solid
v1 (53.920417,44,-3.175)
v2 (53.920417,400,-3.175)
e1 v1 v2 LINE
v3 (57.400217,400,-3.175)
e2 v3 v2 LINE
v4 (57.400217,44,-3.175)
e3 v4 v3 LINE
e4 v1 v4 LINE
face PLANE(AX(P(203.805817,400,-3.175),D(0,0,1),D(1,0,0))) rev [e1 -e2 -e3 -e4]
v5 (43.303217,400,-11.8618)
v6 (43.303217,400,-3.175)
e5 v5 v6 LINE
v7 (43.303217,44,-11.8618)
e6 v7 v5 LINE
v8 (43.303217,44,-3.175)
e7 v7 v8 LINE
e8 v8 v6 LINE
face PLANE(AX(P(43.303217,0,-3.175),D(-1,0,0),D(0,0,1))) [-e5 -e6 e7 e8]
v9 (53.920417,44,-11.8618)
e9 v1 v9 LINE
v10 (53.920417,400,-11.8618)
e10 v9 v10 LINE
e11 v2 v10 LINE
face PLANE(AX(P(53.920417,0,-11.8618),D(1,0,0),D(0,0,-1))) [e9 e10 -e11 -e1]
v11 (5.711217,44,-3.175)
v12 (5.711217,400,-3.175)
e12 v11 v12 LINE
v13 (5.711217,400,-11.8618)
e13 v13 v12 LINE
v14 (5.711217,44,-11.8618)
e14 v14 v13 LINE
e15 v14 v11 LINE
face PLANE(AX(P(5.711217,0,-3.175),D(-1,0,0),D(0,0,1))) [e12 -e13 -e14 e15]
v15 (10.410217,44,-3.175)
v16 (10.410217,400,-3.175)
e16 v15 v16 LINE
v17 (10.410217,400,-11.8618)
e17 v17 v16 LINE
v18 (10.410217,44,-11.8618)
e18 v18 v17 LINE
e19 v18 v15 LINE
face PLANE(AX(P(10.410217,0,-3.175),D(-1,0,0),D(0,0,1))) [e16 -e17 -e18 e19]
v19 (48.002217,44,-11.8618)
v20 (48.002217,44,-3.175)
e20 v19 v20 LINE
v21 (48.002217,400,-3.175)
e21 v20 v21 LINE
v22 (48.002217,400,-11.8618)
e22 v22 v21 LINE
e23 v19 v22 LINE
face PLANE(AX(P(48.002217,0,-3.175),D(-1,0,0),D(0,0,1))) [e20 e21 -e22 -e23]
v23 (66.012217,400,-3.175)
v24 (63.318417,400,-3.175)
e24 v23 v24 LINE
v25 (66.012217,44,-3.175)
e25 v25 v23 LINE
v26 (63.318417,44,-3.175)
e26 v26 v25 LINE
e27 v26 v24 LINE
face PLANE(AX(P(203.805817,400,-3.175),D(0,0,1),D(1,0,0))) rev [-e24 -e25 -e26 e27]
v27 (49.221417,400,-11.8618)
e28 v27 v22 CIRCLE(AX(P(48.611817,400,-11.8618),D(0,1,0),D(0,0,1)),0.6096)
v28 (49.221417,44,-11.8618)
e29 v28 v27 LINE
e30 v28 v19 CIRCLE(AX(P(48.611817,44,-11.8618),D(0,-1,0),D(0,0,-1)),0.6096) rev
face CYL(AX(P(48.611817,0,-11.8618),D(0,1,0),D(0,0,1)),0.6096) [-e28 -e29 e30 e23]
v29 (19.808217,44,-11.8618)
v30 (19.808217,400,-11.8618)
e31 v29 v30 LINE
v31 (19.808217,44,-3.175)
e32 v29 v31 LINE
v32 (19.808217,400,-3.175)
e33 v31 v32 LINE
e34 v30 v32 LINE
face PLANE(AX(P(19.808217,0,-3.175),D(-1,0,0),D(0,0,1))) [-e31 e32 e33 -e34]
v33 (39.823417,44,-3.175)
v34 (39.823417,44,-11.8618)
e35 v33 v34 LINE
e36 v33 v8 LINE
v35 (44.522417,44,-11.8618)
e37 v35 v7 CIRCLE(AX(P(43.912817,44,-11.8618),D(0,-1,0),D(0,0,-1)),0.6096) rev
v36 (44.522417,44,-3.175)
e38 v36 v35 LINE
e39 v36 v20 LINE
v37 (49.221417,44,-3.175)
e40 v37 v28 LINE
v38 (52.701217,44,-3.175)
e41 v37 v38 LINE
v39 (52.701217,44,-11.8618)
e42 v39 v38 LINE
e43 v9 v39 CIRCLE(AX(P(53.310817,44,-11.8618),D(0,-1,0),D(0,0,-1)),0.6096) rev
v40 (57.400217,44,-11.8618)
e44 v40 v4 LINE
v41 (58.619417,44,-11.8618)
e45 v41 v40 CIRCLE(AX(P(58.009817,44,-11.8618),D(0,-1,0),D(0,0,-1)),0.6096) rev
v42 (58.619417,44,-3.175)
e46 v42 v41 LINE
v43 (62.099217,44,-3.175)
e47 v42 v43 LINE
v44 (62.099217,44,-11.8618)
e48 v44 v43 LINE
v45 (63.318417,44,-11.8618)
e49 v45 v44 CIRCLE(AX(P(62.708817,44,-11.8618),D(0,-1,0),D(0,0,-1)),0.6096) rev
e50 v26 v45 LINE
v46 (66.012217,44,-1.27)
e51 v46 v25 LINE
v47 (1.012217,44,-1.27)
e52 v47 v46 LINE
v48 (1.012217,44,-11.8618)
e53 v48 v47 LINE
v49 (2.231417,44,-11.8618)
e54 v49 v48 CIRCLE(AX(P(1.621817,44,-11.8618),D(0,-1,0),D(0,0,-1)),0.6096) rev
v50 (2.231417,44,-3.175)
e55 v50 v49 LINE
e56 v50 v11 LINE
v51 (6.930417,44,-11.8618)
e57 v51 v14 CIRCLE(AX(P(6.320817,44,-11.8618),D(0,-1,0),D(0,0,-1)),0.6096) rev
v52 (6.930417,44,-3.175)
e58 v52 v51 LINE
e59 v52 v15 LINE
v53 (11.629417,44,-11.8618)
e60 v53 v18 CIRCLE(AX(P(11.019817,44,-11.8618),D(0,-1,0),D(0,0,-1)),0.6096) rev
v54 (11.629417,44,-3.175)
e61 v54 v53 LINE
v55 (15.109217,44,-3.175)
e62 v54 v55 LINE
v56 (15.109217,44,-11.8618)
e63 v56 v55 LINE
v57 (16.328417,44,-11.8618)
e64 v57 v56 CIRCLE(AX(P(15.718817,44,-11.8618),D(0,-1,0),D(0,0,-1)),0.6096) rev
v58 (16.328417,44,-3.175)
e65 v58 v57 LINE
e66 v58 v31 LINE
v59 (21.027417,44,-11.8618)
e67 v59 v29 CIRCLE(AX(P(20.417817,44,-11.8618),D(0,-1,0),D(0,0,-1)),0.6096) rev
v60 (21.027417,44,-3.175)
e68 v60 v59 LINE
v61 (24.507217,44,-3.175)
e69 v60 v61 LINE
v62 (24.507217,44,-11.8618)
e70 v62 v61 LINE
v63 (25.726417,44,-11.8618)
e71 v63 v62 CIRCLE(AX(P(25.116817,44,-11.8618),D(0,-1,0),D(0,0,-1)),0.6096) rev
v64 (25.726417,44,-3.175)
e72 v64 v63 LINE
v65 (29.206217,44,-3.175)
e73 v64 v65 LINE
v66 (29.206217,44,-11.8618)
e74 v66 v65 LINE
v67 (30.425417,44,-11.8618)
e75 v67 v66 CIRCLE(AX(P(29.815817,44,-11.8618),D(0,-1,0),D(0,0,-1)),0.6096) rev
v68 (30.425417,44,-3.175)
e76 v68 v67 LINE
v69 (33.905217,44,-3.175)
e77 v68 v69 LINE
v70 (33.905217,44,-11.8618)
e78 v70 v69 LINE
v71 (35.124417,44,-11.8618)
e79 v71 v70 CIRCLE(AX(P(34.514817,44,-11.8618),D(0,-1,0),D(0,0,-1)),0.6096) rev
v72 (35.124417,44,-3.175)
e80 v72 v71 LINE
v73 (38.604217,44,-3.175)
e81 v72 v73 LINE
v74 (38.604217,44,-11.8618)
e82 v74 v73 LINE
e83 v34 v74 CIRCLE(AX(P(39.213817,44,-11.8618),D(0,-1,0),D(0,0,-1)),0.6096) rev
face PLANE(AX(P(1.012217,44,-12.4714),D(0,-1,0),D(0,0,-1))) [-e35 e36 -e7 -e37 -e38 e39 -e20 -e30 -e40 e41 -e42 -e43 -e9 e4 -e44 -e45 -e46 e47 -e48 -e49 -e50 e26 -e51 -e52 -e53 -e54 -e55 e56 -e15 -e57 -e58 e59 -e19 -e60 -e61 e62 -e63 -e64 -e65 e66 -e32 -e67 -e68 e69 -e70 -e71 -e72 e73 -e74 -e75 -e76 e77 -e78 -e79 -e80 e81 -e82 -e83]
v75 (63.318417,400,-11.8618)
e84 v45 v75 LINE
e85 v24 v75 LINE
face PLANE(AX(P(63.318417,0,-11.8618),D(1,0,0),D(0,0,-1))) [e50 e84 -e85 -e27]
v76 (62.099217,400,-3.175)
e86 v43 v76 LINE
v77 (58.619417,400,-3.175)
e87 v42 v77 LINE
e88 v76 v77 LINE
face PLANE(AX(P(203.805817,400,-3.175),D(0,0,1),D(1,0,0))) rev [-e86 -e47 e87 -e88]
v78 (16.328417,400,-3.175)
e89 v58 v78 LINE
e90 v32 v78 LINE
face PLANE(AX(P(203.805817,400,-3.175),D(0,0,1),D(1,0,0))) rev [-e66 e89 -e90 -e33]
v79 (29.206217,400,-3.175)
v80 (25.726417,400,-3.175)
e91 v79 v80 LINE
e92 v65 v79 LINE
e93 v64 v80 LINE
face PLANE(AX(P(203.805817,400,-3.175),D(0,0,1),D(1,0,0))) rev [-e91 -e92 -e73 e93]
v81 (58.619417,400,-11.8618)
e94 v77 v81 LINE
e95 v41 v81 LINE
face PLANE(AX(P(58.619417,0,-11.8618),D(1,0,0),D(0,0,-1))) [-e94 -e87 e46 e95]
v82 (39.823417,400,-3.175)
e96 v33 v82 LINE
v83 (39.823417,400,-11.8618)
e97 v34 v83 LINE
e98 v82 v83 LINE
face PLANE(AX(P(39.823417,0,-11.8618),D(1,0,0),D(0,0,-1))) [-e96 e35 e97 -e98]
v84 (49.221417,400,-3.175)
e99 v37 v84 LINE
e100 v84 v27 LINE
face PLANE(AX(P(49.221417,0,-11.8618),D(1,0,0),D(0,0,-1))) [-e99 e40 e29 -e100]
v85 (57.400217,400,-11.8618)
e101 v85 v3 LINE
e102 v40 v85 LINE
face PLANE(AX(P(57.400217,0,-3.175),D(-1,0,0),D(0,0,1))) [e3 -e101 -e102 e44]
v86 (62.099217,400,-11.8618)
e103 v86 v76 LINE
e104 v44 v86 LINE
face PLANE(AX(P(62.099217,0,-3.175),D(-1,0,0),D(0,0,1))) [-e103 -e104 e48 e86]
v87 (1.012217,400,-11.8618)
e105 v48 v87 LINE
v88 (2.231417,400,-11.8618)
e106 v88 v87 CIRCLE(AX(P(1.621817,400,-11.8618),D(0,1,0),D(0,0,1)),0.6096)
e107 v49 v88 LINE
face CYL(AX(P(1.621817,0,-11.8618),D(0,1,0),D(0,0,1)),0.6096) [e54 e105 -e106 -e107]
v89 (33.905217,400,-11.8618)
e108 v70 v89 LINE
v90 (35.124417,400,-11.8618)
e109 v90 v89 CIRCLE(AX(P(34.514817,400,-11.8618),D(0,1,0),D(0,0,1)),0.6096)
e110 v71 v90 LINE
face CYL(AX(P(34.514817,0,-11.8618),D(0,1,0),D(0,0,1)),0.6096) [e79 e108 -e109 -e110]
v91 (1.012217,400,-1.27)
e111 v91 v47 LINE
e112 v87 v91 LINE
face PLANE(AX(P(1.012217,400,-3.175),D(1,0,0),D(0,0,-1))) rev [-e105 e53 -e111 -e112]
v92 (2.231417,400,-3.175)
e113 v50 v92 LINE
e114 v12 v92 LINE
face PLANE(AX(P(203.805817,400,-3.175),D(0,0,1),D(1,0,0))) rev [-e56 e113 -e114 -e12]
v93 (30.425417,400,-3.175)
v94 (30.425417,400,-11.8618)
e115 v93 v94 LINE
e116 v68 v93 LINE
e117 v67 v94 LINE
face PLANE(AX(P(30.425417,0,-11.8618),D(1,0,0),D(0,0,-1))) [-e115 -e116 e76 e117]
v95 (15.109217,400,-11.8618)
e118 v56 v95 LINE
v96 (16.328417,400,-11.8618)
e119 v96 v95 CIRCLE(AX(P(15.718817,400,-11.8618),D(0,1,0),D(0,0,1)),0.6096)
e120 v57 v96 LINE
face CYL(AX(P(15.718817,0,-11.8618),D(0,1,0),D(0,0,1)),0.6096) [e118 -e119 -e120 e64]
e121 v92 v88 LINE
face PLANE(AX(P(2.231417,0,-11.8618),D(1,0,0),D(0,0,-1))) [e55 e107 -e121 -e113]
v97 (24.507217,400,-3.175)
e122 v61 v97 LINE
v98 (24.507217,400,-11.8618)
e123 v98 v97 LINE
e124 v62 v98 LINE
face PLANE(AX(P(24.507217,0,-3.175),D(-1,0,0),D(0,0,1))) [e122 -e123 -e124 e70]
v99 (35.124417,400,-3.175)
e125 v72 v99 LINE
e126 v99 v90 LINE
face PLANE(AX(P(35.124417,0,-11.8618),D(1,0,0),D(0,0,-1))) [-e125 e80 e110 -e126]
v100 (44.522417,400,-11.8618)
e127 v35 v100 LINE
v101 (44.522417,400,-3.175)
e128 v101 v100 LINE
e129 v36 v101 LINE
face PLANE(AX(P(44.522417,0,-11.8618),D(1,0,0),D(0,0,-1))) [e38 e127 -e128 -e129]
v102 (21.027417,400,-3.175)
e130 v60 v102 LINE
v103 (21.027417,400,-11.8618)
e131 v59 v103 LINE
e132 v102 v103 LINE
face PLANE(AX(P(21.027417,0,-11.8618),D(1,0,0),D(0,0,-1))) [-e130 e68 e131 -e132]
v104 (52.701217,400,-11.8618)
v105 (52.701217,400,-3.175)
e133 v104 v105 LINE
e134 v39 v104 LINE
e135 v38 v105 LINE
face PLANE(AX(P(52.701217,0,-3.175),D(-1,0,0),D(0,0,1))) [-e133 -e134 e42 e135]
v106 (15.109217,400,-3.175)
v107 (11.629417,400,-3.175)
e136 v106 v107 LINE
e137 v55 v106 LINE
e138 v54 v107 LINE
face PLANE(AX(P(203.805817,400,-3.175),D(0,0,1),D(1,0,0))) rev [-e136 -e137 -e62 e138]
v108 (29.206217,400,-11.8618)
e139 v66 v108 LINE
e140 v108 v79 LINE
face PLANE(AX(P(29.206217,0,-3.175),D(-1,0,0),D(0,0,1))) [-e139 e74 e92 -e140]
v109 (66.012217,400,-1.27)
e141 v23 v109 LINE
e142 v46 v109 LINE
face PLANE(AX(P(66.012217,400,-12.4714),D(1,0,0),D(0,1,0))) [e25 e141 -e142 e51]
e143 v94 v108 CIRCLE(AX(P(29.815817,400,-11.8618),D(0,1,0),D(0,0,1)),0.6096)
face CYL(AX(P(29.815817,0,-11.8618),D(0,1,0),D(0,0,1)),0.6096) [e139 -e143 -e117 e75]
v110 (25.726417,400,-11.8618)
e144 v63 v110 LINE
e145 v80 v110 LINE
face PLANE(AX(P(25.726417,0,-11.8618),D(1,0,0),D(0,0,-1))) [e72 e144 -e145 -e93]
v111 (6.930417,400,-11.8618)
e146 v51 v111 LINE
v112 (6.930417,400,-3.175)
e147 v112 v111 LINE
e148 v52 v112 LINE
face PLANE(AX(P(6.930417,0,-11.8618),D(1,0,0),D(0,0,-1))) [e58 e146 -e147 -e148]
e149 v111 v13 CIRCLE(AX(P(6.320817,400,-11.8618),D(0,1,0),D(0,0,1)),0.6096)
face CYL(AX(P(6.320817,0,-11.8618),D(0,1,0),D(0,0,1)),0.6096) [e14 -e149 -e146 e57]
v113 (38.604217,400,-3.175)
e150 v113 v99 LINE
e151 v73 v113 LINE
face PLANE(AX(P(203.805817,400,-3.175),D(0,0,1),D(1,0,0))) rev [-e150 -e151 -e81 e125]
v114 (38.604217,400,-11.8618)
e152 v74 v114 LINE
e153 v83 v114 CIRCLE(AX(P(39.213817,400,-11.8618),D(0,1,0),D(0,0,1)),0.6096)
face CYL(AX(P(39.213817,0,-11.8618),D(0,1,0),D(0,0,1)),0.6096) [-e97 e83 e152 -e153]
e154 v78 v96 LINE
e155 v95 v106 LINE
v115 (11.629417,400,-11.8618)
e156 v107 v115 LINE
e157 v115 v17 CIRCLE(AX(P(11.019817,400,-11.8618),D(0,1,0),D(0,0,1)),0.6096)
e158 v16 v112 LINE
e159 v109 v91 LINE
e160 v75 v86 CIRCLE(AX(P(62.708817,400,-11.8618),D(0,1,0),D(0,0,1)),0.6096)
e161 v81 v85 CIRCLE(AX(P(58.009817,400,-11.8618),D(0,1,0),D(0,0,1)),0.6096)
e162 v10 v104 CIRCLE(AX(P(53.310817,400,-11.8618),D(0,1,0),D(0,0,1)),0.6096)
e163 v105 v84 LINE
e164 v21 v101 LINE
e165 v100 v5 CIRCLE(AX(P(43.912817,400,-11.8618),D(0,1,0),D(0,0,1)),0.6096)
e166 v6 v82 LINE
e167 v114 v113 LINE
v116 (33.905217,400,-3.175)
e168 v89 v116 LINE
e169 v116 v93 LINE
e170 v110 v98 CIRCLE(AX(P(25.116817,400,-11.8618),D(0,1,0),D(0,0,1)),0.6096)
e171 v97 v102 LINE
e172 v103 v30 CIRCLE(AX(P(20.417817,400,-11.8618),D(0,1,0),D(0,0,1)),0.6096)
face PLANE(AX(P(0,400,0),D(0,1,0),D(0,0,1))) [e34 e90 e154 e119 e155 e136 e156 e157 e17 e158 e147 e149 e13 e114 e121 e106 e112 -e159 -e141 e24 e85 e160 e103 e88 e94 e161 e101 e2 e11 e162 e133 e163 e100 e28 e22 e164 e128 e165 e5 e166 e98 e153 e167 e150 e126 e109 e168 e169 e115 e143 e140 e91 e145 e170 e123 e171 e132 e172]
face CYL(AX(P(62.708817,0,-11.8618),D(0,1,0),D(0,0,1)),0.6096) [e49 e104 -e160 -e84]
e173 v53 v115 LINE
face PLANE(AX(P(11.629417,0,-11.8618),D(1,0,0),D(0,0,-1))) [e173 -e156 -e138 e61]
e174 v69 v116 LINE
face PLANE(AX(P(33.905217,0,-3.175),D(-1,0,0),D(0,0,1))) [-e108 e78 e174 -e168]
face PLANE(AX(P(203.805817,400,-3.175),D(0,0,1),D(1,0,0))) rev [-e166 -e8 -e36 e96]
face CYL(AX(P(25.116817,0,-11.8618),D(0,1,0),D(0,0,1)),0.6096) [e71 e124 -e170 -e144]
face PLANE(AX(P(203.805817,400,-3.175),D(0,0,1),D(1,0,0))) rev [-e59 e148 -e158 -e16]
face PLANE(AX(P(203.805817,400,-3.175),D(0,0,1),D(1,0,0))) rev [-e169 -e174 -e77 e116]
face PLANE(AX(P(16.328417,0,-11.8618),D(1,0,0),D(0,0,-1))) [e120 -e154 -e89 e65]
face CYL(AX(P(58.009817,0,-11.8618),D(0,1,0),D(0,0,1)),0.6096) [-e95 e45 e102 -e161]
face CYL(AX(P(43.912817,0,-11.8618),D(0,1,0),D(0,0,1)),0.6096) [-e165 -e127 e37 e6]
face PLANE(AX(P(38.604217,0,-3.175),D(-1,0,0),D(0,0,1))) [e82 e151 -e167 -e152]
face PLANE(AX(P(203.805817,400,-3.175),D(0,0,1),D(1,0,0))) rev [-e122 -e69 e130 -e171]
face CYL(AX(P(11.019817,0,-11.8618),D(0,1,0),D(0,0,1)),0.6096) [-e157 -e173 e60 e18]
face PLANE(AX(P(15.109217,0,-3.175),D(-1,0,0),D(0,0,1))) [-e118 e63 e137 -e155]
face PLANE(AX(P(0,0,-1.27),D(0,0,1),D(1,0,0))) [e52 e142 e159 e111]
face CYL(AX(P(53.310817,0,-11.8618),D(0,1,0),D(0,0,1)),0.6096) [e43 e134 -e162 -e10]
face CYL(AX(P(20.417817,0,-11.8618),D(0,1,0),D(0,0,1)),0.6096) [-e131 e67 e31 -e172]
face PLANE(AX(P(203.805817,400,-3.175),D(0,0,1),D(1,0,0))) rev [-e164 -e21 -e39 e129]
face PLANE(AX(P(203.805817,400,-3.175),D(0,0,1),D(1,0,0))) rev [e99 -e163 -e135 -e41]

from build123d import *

# Parameters (mm, degrees)
BOSS_EXTRUDE1_DEPTH   = 400
BOSS_EXTRUDE2_DEPTH   = 400
SKETCH_PATTERN1_DEPTH = 400
SKETCH5_W             = 0.4826
SKETCH5_H             = 3.175
BOSS_EXTRUDE3_DEPTH   = 350
SKETCH10_OUTSIDE_W    = 295.048
SKETCH10_OUTSIDE_H    = 491.772
SKETCH10_OUTSIDE_W_2  = 65
SKETCH10_OUTSIDE_H_2  = 400
CUT_EXTRUDE3_DEPTH    = 450.320924212
SKETCH11_OUTSIDE_W    = 148.088
SKETCH11_OUTSIDE_H    = 483.088
SKETCH11_OUTSIDE_W_2  = 65
SKETCH11_OUTSIDE_H_2  = 356
CUT_EXTRUDE4_DEPTH    = 406.602204808
SKETCH12_W            = 65
SKETCH12_H            = 356
CUT_EXTRUDE5_DEPTH    = 1.27


# Read off the part's stored shape, not the designer's step: Sketch-Pattern1
with BuildPart() as part:
    # Sketch1 → Boss-Extrude1 (new body)
    with BuildSketch(Plane(origin=(0, 0, 0), x_dir=(1, 0, 0), z_dir=(0, 1, 0))):
        Polygon((1.012216501, 3.175), (1.012216501, 0), (203.805816501, 0), (203.805816501, 3.175), (2.231416501, 3.175), align=None)
    extrude(amount=BOSS_EXTRUDE1_DEPTH)

    # Sketch3 → Boss-Extrude2 (add, through all)
    with BuildSketch(Plane(origin=(0, 400, 0), x_dir=(1, 0, 0), z_dir=(0, 1, 0))):
        with BuildLine():
            Line((1.012216501, 3.175), (1.012216501, 11.8618))
            ThreePointArc((1.012216501, 11.8618), (1.621816501, 12.4714), (2.231416501, 11.8618))
            Line((2.231416501, 11.8618), (2.231416501, 3.175))
            Line((2.231416501, 3.175), (1.012216501, 3.175))
        make_face()
    extrude(amount=-BOSS_EXTRUDE2_DEPTH)

    # Sketch-Pattern1 outline → Sketch-Pattern1 (add)
    with BuildSketch(Plane(origin=(0, 0, 0), x_dir=(1, 0, 0), z_dir=(0, 1, 0))):
        with BuildLine():
            Line((6.930416501, 3.175), (6.930416501, 11.8618))
            ThreePointArc((6.930416501, 11.8618), (6.320816501, 12.4714), (5.711216501, 11.8618))
            Line((5.711216501, 11.8618), (5.711216501, 3.175))
            Line((5.711216501, 3.175), (6.930416501, 3.175))
        make_face()
        with BuildLine():
            Line((203.069216501, 11.8618), (203.069216501, 3.175))
            Line((203.069216501, 3.175), (204.288416501, 3.175))
            Line((204.288416501, 3.175), (204.288416501, 11.8618))
            ThreePointArc((204.288416501, 11.8618), (203.678816501, 12.4714), (203.069216501, 11.8618))
        make_face()
        with BuildLine():
            Line((198.370216501, 11.8618), (198.370216501, 3.175))
            Line((198.370216501, 3.175), (199.589416501, 3.175))
            Line((199.589416501, 3.175), (199.589416501, 11.8618))
            ThreePointArc((199.589416501, 11.8618), (198.979816501, 12.4714), (198.370216501, 11.8618))
        make_face()
        with BuildLine():
            Line((193.671216501, 11.8618), (193.671216501, 3.175))
            Line((193.671216501, 3.175), (194.890416501, 3.175))
            Line((194.890416501, 3.175), (194.890416501, 11.8618))
            ThreePointArc((194.890416501, 11.8618), (194.280816501, 12.4714), (193.671216501, 11.8618))
        make_face()
        with BuildLine():
            Line((188.972216501, 11.8618), (188.972216501, 3.175))
            Line((188.972216501, 3.175), (190.191416501, 3.175))
            Line((190.191416501, 3.175), (190.191416501, 11.8618))
            ThreePointArc((190.191416501, 11.8618), (189.581816501, 12.4714), (188.972216501, 11.8618))
        make_face()
        with BuildLine():
            Line((184.273216501, 11.8618), (184.273216501, 3.175))
            Line((184.273216501, 3.175), (185.492416501, 3.175))
            Line((185.492416501, 3.175), (185.492416501, 11.8618))
            ThreePointArc((185.492416501, 11.8618), (184.882816501, 12.4714), (184.273216501, 11.8618))
        make_face()
        with BuildLine():
            Line((179.574216501, 11.8618), (179.574216501, 3.175))
            Line((179.574216501, 3.175), (180.793416501, 3.175))
            Line((180.793416501, 3.175), (180.793416501, 11.8618))
            ThreePointArc((180.793416501, 11.8618), (180.183816501, 12.4714), (179.574216501, 11.8618))
        make_face()
        with BuildLine():
            Line((174.875216501, 11.8618), (174.875216501, 3.175))
            Line((174.875216501, 3.175), (176.094416501, 3.175))
            Line((176.094416501, 3.175), (176.094416501, 11.8618))
            ThreePointArc((176.094416501, 11.8618), (175.484816501, 12.4714), (174.875216501, 11.8618))
        make_face()
        with BuildLine():
            Line((170.176216501, 11.8618), (170.176216501, 3.175))
            Line((170.176216501, 3.175), (171.395416501, 3.175))
            Line((171.395416501, 3.175), (171.395416501, 11.8618))
            ThreePointArc((171.395416501, 11.8618), (170.785816501, 12.4714), (170.176216501, 11.8618))
        make_face()
        with BuildLine():
            Line((165.477216501, 11.8618), (165.477216501, 3.175))
            Line((165.477216501, 3.175), (166.696416501, 3.175))
            Line((166.696416501, 3.175), (166.696416501, 11.8618))
            ThreePointArc((166.696416501, 11.8618), (166.086816501, 12.4714), (165.477216501, 11.8618))
        make_face()
        with BuildLine():
            Line((160.778216501, 11.8618), (160.778216501, 3.175))
            Line((160.778216501, 3.175), (161.997416501, 3.175))
            Line((161.997416501, 3.175), (161.997416501, 11.8618))
            ThreePointArc((161.997416501, 11.8618), (161.387816501, 12.4714), (160.778216501, 11.8618))
        make_face()
        with BuildLine():
            Line((156.079216501, 11.8618), (156.079216501, 3.175))
            Line((156.079216501, 3.175), (157.298416501, 3.175))
            Line((157.298416501, 3.175), (157.298416501, 11.8618))
            ThreePointArc((157.298416501, 11.8618), (156.688816501, 12.4714), (156.079216501, 11.8618))
        make_face()
        with BuildLine():
            Line((151.380216501, 11.8618), (151.380216501, 3.175))
            Line((151.380216501, 3.175), (152.599416501, 3.175))
            Line((152.599416501, 3.175), (152.599416501, 11.8618))
            ThreePointArc((152.599416501, 11.8618), (151.989816501, 12.4714), (151.380216501, 11.8618))
        make_face()
        with BuildLine():
            Line((146.681216501, 11.8618), (146.681216501, 3.175))
            Line((146.681216501, 3.175), (147.900416501, 3.175))
            Line((147.900416501, 3.175), (147.900416501, 11.8618))
            ThreePointArc((147.900416501, 11.8618), (147.290816501, 12.4714), (146.681216501, 11.8618))
        make_face()
        with BuildLine():
            Line((141.982216501, 11.8618), (141.982216501, 3.175))
            Line((141.982216501, 3.175), (143.201416501, 3.175))
            Line((143.201416501, 3.175), (143.201416501, 11.8618))
            ThreePointArc((143.201416501, 11.8618), (142.591816501, 12.4714), (141.982216501, 11.8618))
        make_face()
        with BuildLine():
            Line((137.283216501, 11.8618), (137.283216501, 3.175))
            Line((137.283216501, 3.175), (138.502416501, 3.175))
            Line((138.502416501, 3.175), (138.502416501, 11.8618))
            ThreePointArc((138.502416501, 11.8618), (137.892816501, 12.4714), (137.283216501, 11.8618))
        make_face()
        with BuildLine():
            Line((132.584216501, 11.8618), (132.584216501, 3.175))
            Line((132.584216501, 3.175), (133.803416501, 3.175))
            Line((133.803416501, 3.175), (133.803416501, 11.8618))
            ThreePointArc((133.803416501, 11.8618), (133.193816501, 12.4714), (132.584216501, 11.8618))
        make_face()
        with BuildLine():
            Line((127.885216501, 11.8618), (127.885216501, 3.175))
            Line((127.885216501, 3.175), (129.104416501, 3.175))
            Line((129.104416501, 3.175), (129.104416501, 11.8618))
            ThreePointArc((129.104416501, 11.8618), (128.494816501, 12.4714), (127.885216501, 11.8618))
        make_face()
        with BuildLine():
            Line((123.186216501, 11.8618), (123.186216501, 3.175))
            Line((123.186216501, 3.175), (124.405416501, 3.175))
            Line((124.405416501, 3.175), (124.405416501, 11.8618))
            ThreePointArc((124.405416501, 11.8618), (123.795816501, 12.4714), (123.186216501, 11.8618))
        make_face()
        with BuildLine():
            Line((118.487216501, 11.8618), (118.487216501, 3.175))
            Line((118.487216501, 3.175), (119.706416501, 3.175))
            Line((119.706416501, 3.175), (119.706416501, 11.8618))
            ThreePointArc((119.706416501, 11.8618), (119.096816501, 12.4714), (118.487216501, 11.8618))
        make_face()
        with BuildLine():
            Line((113.788216501, 11.8618), (113.788216501, 3.175))
            Line((113.788216501, 3.175), (115.007416501, 3.175))
            Line((115.007416501, 3.175), (115.007416501, 11.8618))
            ThreePointArc((115.007416501, 11.8618), (114.397816501, 12.4714), (113.788216501, 11.8618))
        make_face()
        with BuildLine():
            Line((109.089216501, 11.8618), (109.089216501, 3.175))
            Line((109.089216501, 3.175), (110.308416501, 3.175))
            Line((110.308416501, 3.175), (110.308416501, 11.8618))
            ThreePointArc((110.308416501, 11.8618), (109.698816501, 12.4714), (109.089216501, 11.8618))
        make_face()
        with BuildLine():
            Line((104.390216501, 11.8618), (104.390216501, 3.175))
            Line((104.390216501, 3.175), (105.609416501, 3.175))
            Line((105.609416501, 3.175), (105.609416501, 11.8618))
            ThreePointArc((105.609416501, 11.8618), (104.999816501, 12.4714), (104.390216501, 11.8618))
        make_face()
        with BuildLine():
            Line((99.691216501, 11.8618), (99.691216501, 3.175))
            Line((99.691216501, 3.175), (100.910416501, 3.175))
            Line((100.910416501, 3.175), (100.910416501, 11.8618))
            ThreePointArc((100.910416501, 11.8618), (100.300816501, 12.4714), (99.691216501, 11.8618))
        make_face()
        with BuildLine():
            Line((94.992216501, 11.8618), (94.992216501, 3.175))
            Line((94.992216501, 3.175), (96.211416501, 3.175))
            Line((96.211416501, 3.175), (96.211416501, 11.8618))
            ThreePointArc((96.211416501, 11.8618), (95.601816501, 12.4714), (94.992216501, 11.8618))
        make_face()
        with BuildLine():
            Line((90.293216501, 11.8618), (90.293216501, 3.175))
            Line((90.293216501, 3.175), (91.512416501, 3.175))
            Line((91.512416501, 3.175), (91.512416501, 11.8618))
            ThreePointArc((91.512416501, 11.8618), (90.902816501, 12.4714), (90.293216501, 11.8618))
        make_face()
        with BuildLine():
            Line((85.594216501, 11.8618), (85.594216501, 3.175))
            Line((85.594216501, 3.175), (86.813416501, 3.175))
            Line((86.813416501, 3.175), (86.813416501, 11.8618))
            ThreePointArc((86.813416501, 11.8618), (86.203816501, 12.4714), (85.594216501, 11.8618))
        make_face()
        with BuildLine():
            Line((80.895216501, 11.8618), (80.895216501, 3.175))
            Line((80.895216501, 3.175), (82.114416501, 3.175))
            Line((82.114416501, 3.175), (82.114416501, 11.8618))
            ThreePointArc((82.114416501, 11.8618), (81.504816501, 12.4714), (80.895216501, 11.8618))
        make_face()
        with BuildLine():
            Line((76.196216501, 11.8618), (76.196216501, 3.175))
            Line((76.196216501, 3.175), (77.415416501, 3.175))
            Line((77.415416501, 3.175), (77.415416501, 11.8618))
            ThreePointArc((77.415416501, 11.8618), (76.805816501, 12.4714), (76.196216501, 11.8618))
        make_face()
        with BuildLine():
            Line((71.497216501, 11.8618), (71.497216501, 3.175))
            Line((71.497216501, 3.175), (72.716416501, 3.175))
            Line((72.716416501, 3.175), (72.716416501, 11.8618))
            ThreePointArc((72.716416501, 11.8618), (72.106816501, 12.4714), (71.497216501, 11.8618))
        make_face()
        with BuildLine():
            Line((66.798216501, 11.8618), (66.798216501, 3.175))
            Line((66.798216501, 3.175), (68.017416501, 3.175))
            Line((68.017416501, 3.175), (68.017416501, 11.8618))
            ThreePointArc((68.017416501, 11.8618), (67.407816501, 12.4714), (66.798216501, 11.8618))
        make_face()
        with BuildLine():
            Line((62.099216501, 11.8618), (62.099216501, 3.175))
            Line((62.099216501, 3.175), (63.318416501, 3.175))
            Line((63.318416501, 3.175), (63.318416501, 11.8618))
            ThreePointArc((63.318416501, 11.8618), (62.708816501, 12.4714), (62.099216501, 11.8618))
        make_face()
        with BuildLine():
            Line((57.400216501, 11.8618), (57.400216501, 3.175))
            Line((57.400216501, 3.175), (58.619416501, 3.175))
            Line((58.619416501, 3.175), (58.619416501, 11.8618))
            ThreePointArc((58.619416501, 11.8618), (58.009816501, 12.4714), (57.400216501, 11.8618))
        make_face()
        with BuildLine():
            Line((52.701216501, 11.8618), (52.701216501, 3.175))
            Line((52.701216501, 3.175), (53.920416501, 3.175))
            Line((53.920416501, 3.175), (53.920416501, 11.8618))
            ThreePointArc((53.920416501, 11.8618), (53.310816501, 12.4714), (52.701216501, 11.8618))
        make_face()
        with BuildLine():
            Line((48.002216501, 11.8618), (48.002216501, 3.175))
            Line((48.002216501, 3.175), (49.221416501, 3.175))
            Line((49.221416501, 3.175), (49.221416501, 11.8618))
            ThreePointArc((49.221416501, 11.8618), (48.611816501, 12.4714), (48.002216501, 11.8618))
        make_face()
        with BuildLine():
            Line((43.303216501, 11.8618), (43.303216501, 3.175))
            Line((43.303216501, 3.175), (44.522416501, 3.175))
            Line((44.522416501, 3.175), (44.522416501, 11.8618))
            ThreePointArc((44.522416501, 11.8618), (43.912816501, 12.4714), (43.303216501, 11.8618))
        make_face()
        with BuildLine():
            Line((38.604216501, 11.8618), (38.604216501, 3.175))
            Line((38.604216501, 3.175), (39.823416501, 3.175))
            Line((39.823416501, 3.175), (39.823416501, 11.8618))
            ThreePointArc((39.823416501, 11.8618), (39.213816501, 12.4714), (38.604216501, 11.8618))
        make_face()
        with BuildLine():
            Line((33.905216501, 11.8618), (33.905216501, 3.175))
            Line((33.905216501, 3.175), (35.124416501, 3.175))
            Line((35.124416501, 3.175), (35.124416501, 11.8618))
            ThreePointArc((35.124416501, 11.8618), (34.514816501, 12.4714), (33.905216501, 11.8618))
        make_face()
        with BuildLine():
            Line((29.206216501, 11.8618), (29.206216501, 3.175))
            Line((29.206216501, 3.175), (30.425416501, 3.175))
            Line((30.425416501, 3.175), (30.425416501, 11.8618))
            ThreePointArc((30.425416501, 11.8618), (29.815816501, 12.4714), (29.206216501, 11.8618))
        make_face()
        with BuildLine():
            Line((24.507216501, 11.8618), (24.507216501, 3.175))
            Line((24.507216501, 3.175), (25.726416501, 3.175))
            Line((25.726416501, 3.175), (25.726416501, 11.8618))
            ThreePointArc((25.726416501, 11.8618), (25.116816501, 12.4714), (24.507216501, 11.8618))
        make_face()
        with BuildLine():
            Line((19.808216501, 11.8618), (19.808216501, 3.175))
            Line((19.808216501, 3.175), (21.027416501, 3.175))
            Line((21.027416501, 3.175), (21.027416501, 11.8618))
            ThreePointArc((21.027416501, 11.8618), (20.417816501, 12.4714), (19.808216501, 11.8618))
        make_face()
        with BuildLine():
            Line((15.109216501, 11.8618), (15.109216501, 3.175))
            Line((15.109216501, 3.175), (16.328416501, 3.175))
            Line((16.328416501, 3.175), (16.328416501, 11.8618))
            ThreePointArc((16.328416501, 11.8618), (15.718816501, 12.4714), (15.109216501, 11.8618))
        make_face()
        with BuildLine():
            Line((10.410216501, 11.8618), (10.410216501, 3.175))
            Line((10.410216501, 3.175), (11.629416501, 3.175))
            Line((11.629416501, 3.175), (11.629416501, 11.8618))
            ThreePointArc((11.629416501, 11.8618), (11.019816501, 12.4714), (10.410216501, 11.8618))
        make_face()
    extrude(amount=SKETCH_PATTERN1_DEPTH)

    # Sketch5 → Boss-Extrude3 (add)
    with BuildSketch(Plane(origin=(0, 400, 0), x_dir=(1, 0, 0), z_dir=(0, 1, 0))):
        with Locations((204.047116501, 1.5875)):
            Rectangle(SKETCH5_W, SKETCH5_H)
    extrude(amount=-BOSS_EXTRUDE3_DEPTH)

    # Sketch10 outside → Cut-Extrude3 (cut, through all)
    with BuildSketch(Plane.XY):
        with Locations((102.65, 200)):
            Rectangle(SKETCH10_OUTSIDE_W, SKETCH10_OUTSIDE_H)
        with Locations((33.512216501, 200)):
            Rectangle(SKETCH10_OUTSIDE_W_2, SKETCH10_OUTSIDE_H_2, mode=Mode.SUBTRACT)
    extrude(amount=-CUT_EXTRUDE3_DEPTH, mode=Mode.SUBTRACT)

    # Sketch11 outside → Cut-Extrude4 (cut, through all)
    with BuildSketch(Plane.XY):
        with Locations((33.512, 200)):
            Rectangle(SKETCH11_OUTSIDE_W, SKETCH11_OUTSIDE_H)
        with Locations((33.512216501, 222)):
            Rectangle(SKETCH11_OUTSIDE_W_2, SKETCH11_OUTSIDE_H_2, mode=Mode.SUBTRACT)
    extrude(amount=-CUT_EXTRUDE4_DEPTH, mode=Mode.SUBTRACT)

    # Sketch12 → Cut-Extrude5 (cut)
    with BuildSketch(Plane.XY):
        with Locations((33.512216501, 222)):
            Rectangle(SKETCH12_W, SKETCH12_H)
    extrude(amount=-CUT_EXTRUDE5_DEPTH, mode=Mode.SUBTRACT)


solid = part.part
